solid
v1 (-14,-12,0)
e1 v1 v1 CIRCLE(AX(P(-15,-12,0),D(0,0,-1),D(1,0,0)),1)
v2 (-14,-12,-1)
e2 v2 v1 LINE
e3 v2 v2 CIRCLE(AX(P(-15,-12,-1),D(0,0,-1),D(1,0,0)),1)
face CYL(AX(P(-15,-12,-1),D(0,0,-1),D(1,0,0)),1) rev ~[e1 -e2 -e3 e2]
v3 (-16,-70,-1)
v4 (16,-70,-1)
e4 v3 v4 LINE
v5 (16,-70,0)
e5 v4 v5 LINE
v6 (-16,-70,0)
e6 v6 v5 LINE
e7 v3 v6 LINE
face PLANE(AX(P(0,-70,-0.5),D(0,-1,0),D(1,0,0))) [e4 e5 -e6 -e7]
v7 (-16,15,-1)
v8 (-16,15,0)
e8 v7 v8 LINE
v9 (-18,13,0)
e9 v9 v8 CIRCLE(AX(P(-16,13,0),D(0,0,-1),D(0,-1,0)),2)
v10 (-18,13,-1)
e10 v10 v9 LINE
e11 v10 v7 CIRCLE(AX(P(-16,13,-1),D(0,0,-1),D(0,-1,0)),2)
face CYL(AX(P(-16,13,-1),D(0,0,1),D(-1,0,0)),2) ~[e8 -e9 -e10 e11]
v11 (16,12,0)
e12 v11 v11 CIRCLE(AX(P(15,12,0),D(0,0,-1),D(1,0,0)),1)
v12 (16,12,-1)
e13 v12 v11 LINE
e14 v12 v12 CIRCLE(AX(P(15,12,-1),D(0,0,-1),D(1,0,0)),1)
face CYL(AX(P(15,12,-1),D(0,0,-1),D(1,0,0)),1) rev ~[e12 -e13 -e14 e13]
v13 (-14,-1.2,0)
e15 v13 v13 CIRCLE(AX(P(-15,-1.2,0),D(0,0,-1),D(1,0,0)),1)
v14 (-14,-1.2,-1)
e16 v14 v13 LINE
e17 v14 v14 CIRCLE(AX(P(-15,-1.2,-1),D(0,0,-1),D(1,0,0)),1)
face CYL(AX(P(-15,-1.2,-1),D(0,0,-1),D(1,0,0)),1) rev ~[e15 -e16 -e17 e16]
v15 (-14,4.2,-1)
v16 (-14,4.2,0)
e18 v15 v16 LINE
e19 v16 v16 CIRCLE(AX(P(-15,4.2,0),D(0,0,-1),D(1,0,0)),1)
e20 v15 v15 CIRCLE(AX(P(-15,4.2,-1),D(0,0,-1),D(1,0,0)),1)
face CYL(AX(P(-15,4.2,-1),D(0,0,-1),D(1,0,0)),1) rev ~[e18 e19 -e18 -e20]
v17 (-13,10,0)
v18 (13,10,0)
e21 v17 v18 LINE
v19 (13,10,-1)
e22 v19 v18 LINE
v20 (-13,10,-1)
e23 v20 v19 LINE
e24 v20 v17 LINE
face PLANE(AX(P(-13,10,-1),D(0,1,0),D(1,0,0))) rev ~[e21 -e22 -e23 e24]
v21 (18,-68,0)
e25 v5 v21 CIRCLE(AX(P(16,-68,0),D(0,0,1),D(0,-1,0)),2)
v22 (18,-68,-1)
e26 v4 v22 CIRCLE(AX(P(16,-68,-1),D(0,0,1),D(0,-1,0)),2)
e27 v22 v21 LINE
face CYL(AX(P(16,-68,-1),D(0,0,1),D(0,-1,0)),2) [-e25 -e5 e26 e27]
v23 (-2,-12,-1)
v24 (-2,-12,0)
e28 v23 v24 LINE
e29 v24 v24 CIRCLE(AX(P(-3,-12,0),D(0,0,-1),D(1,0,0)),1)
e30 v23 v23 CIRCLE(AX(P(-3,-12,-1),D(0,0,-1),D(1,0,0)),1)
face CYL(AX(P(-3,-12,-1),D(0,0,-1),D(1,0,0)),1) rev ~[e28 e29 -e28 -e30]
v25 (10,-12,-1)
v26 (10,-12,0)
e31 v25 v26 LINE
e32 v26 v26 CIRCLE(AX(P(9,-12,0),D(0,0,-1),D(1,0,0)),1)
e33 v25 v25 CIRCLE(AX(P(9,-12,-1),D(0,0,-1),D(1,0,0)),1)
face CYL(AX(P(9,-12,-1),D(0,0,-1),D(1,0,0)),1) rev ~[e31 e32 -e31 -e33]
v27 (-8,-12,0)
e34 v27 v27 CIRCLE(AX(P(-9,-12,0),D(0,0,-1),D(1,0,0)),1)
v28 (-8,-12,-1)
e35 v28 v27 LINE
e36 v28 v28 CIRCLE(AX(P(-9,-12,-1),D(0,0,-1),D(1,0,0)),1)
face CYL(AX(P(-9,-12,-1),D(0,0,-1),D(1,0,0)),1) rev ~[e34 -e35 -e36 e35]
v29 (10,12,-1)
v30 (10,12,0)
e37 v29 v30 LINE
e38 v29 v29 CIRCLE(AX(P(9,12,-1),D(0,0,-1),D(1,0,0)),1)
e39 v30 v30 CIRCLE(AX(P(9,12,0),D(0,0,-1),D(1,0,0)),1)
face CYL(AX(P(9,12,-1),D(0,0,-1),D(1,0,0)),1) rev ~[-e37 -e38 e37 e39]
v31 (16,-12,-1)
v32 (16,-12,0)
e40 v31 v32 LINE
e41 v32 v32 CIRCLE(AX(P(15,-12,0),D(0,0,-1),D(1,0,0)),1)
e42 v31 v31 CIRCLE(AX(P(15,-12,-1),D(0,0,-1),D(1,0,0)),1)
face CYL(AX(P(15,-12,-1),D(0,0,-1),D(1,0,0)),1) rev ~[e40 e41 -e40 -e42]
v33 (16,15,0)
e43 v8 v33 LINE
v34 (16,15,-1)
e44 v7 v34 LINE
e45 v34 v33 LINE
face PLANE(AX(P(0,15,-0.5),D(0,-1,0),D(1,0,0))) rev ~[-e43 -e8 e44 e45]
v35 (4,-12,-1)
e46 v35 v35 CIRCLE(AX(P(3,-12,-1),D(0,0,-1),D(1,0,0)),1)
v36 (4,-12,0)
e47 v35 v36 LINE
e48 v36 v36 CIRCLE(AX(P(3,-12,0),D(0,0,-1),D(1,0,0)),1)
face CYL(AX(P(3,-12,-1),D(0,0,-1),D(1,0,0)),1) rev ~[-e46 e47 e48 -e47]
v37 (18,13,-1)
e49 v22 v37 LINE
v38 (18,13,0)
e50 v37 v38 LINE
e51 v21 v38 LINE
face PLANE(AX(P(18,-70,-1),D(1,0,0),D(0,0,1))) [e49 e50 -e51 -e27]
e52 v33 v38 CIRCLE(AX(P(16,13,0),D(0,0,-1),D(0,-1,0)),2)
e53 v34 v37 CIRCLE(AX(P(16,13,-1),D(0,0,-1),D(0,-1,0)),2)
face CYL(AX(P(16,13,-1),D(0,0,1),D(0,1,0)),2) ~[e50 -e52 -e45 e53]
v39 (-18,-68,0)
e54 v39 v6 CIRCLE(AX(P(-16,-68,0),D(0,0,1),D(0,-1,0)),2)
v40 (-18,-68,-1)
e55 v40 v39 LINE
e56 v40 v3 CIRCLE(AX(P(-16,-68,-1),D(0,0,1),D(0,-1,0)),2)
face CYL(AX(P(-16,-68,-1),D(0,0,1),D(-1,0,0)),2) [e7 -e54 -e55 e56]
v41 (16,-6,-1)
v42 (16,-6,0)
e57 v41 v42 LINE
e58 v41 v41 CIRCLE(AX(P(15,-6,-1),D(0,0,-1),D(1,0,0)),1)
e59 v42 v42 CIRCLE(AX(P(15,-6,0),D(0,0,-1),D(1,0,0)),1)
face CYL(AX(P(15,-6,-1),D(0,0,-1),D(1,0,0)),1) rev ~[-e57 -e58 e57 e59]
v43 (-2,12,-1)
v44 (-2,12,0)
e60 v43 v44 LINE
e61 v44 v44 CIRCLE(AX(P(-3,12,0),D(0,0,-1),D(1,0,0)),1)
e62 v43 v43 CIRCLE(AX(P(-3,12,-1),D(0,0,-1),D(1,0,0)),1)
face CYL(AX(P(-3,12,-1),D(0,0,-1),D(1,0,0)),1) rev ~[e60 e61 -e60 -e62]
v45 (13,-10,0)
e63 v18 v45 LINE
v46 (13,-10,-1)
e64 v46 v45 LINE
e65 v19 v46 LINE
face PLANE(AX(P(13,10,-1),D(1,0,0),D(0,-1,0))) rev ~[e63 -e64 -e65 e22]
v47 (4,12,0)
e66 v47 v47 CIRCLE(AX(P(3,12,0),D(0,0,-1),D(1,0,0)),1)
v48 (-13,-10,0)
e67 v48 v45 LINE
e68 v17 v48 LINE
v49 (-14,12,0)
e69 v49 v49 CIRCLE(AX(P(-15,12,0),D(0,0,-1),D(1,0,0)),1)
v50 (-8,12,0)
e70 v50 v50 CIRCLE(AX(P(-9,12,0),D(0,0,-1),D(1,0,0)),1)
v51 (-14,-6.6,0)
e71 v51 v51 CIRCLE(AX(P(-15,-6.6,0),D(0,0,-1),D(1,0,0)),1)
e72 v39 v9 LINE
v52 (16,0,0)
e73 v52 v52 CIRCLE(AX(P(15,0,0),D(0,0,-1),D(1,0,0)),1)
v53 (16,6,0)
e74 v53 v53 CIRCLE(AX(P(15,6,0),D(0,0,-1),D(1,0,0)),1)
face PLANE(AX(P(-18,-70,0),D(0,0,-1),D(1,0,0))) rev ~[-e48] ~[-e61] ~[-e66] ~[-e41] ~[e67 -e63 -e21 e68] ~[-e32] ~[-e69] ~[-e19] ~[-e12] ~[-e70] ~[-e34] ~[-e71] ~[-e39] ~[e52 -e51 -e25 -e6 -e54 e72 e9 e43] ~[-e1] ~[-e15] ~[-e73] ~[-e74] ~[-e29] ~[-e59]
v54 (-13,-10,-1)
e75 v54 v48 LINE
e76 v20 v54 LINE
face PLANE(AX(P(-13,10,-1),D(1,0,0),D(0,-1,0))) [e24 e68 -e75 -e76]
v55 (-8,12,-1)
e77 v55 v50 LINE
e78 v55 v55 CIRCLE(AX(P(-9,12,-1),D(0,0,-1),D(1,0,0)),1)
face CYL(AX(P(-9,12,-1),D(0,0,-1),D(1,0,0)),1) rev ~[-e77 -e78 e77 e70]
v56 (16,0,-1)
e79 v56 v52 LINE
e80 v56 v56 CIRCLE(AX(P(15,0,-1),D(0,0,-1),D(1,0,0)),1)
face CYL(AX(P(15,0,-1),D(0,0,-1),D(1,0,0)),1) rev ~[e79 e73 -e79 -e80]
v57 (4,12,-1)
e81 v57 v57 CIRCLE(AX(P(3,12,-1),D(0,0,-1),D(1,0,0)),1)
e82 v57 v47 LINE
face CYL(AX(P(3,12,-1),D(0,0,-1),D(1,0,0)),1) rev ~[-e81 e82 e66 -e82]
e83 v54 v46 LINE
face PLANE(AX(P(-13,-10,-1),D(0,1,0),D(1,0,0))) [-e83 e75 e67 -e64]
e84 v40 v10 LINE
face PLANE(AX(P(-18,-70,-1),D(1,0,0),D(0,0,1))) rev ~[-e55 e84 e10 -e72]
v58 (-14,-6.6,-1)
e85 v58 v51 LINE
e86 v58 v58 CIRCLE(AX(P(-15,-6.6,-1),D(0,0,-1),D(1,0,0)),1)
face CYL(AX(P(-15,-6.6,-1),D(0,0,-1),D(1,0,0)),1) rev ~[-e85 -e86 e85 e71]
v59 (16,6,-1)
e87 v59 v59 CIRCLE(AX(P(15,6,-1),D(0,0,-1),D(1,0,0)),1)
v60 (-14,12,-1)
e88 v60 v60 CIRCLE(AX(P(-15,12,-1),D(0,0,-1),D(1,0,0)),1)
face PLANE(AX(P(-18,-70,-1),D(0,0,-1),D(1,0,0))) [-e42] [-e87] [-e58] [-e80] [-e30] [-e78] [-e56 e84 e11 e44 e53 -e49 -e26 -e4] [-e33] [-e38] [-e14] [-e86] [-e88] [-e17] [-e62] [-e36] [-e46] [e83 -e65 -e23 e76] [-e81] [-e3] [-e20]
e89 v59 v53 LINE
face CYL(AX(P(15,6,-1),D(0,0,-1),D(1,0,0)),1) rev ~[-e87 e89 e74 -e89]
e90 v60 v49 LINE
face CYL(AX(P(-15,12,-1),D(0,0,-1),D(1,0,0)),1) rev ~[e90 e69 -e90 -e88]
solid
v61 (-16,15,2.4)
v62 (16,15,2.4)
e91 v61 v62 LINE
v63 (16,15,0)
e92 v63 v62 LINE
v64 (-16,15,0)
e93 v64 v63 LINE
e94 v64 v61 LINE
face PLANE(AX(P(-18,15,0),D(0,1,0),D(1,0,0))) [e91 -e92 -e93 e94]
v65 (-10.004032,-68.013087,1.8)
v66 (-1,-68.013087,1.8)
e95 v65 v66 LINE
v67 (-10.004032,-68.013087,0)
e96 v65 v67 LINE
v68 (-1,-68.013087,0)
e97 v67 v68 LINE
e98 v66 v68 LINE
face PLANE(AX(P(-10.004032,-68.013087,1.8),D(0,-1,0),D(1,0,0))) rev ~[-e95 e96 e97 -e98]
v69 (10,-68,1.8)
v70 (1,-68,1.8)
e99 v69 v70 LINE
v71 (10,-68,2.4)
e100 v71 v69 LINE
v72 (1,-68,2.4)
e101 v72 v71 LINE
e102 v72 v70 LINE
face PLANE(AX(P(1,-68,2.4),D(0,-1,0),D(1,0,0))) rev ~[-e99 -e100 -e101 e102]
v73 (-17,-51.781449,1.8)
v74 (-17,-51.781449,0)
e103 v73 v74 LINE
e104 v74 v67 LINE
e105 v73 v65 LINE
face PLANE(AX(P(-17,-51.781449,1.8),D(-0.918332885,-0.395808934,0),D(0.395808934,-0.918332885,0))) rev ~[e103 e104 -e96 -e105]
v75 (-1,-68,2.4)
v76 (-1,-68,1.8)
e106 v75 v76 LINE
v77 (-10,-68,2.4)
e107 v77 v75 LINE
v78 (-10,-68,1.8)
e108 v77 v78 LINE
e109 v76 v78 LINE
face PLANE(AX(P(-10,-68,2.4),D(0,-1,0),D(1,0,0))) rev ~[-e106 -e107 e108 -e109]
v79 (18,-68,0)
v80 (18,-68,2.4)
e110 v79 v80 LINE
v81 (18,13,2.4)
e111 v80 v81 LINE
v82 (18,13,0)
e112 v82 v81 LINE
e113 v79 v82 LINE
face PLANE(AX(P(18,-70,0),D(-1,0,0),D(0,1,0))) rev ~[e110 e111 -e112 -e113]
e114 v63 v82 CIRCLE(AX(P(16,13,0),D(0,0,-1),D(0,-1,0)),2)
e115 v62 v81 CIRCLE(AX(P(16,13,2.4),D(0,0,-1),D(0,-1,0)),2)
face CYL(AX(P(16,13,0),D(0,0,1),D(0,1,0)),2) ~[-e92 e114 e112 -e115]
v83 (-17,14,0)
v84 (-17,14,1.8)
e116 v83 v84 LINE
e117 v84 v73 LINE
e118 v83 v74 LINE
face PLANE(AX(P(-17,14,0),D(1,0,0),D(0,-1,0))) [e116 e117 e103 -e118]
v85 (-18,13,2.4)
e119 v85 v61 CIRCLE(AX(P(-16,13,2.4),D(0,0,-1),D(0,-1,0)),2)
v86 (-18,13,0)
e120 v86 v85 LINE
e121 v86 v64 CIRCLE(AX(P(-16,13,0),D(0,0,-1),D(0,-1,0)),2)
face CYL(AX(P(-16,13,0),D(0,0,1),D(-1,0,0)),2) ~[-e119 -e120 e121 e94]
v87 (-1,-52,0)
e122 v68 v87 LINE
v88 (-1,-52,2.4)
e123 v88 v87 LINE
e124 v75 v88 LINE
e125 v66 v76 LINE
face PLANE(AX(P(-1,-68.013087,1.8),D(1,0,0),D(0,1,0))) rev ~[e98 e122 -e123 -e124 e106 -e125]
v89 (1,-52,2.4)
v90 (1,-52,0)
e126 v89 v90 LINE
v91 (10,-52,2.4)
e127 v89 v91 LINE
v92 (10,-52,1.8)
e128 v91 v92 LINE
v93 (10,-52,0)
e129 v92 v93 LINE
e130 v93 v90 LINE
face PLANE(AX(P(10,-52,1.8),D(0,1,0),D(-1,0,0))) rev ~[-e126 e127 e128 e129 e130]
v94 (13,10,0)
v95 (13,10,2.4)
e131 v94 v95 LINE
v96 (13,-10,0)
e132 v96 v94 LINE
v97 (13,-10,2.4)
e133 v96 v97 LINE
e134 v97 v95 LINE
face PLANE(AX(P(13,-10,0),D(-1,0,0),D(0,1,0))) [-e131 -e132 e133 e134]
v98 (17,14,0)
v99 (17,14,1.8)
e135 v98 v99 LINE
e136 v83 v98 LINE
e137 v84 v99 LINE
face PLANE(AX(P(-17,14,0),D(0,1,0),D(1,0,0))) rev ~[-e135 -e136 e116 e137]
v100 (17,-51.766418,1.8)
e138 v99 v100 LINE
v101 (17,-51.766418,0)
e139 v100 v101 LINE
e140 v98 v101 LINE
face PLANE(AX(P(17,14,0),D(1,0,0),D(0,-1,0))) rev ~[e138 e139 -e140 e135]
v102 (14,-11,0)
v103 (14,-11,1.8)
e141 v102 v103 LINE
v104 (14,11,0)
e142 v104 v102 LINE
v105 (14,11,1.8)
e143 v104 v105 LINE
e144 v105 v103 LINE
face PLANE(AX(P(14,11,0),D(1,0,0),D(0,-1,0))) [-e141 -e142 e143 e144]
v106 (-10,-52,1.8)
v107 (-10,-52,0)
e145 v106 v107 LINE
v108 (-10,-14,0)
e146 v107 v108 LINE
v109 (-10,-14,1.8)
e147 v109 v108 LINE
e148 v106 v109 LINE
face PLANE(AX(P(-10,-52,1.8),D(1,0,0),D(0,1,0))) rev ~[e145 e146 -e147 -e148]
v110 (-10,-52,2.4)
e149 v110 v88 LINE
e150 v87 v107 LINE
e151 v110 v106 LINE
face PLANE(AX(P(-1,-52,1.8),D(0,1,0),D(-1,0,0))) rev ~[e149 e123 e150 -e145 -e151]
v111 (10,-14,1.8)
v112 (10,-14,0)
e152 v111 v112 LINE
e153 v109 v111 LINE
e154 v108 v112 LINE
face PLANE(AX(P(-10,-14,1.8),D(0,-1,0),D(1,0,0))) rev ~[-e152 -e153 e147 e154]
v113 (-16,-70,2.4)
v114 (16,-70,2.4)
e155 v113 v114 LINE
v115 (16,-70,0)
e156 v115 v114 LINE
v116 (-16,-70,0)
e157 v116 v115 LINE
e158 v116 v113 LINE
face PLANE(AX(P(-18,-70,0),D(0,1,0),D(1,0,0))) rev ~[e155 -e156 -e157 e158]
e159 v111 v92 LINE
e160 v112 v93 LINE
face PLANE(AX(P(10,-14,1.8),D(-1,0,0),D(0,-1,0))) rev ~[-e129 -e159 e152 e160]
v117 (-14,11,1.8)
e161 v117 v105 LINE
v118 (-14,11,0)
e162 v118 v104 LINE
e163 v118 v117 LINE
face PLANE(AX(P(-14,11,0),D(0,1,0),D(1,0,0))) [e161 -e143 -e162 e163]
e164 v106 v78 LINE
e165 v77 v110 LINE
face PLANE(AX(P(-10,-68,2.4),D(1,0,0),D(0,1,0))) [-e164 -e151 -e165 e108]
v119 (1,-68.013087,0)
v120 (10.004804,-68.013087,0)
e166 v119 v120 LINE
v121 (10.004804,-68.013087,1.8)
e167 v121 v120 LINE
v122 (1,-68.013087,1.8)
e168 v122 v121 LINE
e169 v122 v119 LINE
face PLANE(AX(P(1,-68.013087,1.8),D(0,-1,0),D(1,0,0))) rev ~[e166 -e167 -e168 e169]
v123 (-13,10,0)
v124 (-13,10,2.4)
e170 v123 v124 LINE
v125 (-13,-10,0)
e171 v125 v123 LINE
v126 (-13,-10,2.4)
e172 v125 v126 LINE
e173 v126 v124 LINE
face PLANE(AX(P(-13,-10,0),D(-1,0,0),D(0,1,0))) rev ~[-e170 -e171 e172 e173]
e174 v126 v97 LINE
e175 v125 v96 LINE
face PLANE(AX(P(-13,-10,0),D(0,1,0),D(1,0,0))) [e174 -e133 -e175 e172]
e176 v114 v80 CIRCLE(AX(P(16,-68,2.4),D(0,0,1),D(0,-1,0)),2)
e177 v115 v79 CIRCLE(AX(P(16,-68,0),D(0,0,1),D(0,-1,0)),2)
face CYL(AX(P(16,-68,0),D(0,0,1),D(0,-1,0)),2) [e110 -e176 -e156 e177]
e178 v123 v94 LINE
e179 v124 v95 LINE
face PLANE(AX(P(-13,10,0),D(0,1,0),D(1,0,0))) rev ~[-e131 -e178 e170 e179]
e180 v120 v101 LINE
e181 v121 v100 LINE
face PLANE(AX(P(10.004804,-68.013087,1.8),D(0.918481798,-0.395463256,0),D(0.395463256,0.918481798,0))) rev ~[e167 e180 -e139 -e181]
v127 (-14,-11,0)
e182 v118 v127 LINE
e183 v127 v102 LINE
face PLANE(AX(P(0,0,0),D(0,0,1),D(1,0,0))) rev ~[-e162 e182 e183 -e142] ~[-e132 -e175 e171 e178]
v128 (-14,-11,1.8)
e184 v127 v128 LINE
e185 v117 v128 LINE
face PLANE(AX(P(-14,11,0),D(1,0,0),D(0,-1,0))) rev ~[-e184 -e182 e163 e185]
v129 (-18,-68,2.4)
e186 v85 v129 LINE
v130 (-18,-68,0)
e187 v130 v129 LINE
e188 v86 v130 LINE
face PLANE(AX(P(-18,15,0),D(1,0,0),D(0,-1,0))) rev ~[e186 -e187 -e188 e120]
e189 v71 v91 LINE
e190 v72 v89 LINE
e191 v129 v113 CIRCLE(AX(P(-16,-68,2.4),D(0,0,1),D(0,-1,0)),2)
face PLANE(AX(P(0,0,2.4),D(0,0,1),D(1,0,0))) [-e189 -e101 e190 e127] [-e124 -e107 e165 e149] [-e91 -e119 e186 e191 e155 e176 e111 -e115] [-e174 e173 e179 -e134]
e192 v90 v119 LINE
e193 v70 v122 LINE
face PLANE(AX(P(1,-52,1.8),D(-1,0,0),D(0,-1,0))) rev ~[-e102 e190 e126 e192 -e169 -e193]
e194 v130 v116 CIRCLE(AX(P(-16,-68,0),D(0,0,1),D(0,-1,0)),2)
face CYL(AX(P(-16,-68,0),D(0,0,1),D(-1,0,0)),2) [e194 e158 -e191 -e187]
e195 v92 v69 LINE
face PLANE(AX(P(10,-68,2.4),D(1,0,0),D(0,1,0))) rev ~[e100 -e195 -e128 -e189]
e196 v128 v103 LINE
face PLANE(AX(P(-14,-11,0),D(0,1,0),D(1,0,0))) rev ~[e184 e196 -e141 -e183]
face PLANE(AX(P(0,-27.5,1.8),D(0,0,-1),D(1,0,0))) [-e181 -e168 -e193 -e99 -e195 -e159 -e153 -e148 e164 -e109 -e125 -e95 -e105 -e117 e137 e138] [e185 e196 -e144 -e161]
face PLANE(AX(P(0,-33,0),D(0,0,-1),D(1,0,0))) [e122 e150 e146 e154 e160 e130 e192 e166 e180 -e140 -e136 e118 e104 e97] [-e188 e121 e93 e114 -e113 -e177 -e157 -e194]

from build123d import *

# Parameters (mm, degrees)
F0_W      = 36
F0_H      = 30
F0_W_2    = 26
F0_H_2    = 20
F0_H_3    = 37
F0_H_4    = 18
F1_DEPTH  = 2.4
F2_W      = 34
F2_H      = 83
F2_W_2    = 28
F2_H_2    = 22
F3_DEPTH  = 1.8
F4_W      = 36
F4_H      = 1
F5_DEPTH  = 85
F8_DEPTH  = 1.8
F6_R      = 1
F9_DEPTH  = 3
F6_W      = 26
F6_H      = 20
F11_DEPTH = 25
F12_R     = 2
F12_2_R   = 2
F10_W     = 9
F10_H     = 16
F13_DEPTH = 3


# Not quite as in the source:
# - a feature names something its author has since deleted; it is built from what else it names


with BuildPart() as f1:
    # F0 (on Top) → F1 (new body)
    with BuildSketch(Plane.XY):
        Rectangle(F0_W, F0_H)
        Rectangle(F0_W_2, F0_H_2, mode=Mode.SUBTRACT)
        with Locations((0, -33.5)):
            Rectangle(F0_W, F0_H_3)
        with Locations((0, -61)):
            Rectangle(F0_W, F0_H_4)
    extrude(amount=F1_DEPTH)

    # F2 (on face) → F3 (cut)
    with BuildSketch(Plane(origin=(0, 0, 0), x_dir=(1, 0, 0), z_dir=(0, 0, -1))):
        with Locations((0, 27.5)):
            Rectangle(F2_W, F2_H)
        Rectangle(F2_W_2, F2_H_2, mode=Mode.SUBTRACT)
    extrude(amount=-F3_DEPTH, mode=Mode.SUBTRACT)

    # F7 (on face) → F8 (join, through all)
    with BuildSketch(Plane(origin=(0, 0, 1.8), x_dir=(1, 0, 0), z_dir=(0, 0, -1))):
        Polygon((-10, 14), (0, 14), (10, 14), (10, 52), (1, 52), (0, 52), (-1, 52), (-10, 52), align=None)
        Polygon((-1, 68.013086915), (-1, 52), (0, 52), (1, 52), (1, 68.013086915), align=None)
        Polygon((-10.0040324032, 68.013086915), (-1, 68.013086915), (1, 68.013086915), (10.0048035383, 68.013086915), (17, 51.7664179206), (17, 69), (-17, 69), (-17, 53.814060986), (-17, 51.7814494669), align=None)
    extrude(amount=F8_DEPTH)

    # F12
    f12_edges = [f1.edges().sort_by_distance(p)[0] for p in [
        (18, 15, 1.2),
        (18, -70, 1.2),
        (-18, -70, 1.2),
        (-18, 15, 1.2),
    ]]
    fillet(f12_edges, radius=F12_R)

    # F10 (on face) → F13 (cut)
    with BuildSketch(Plane.XY.offset(2.4)):
        with Locations((5.5, -60)):
            Rectangle(F10_W, F10_H)
        with Locations((-5.5, -60)):
            Rectangle(F10_W, F10_H)
    extrude(amount=-F13_DEPTH, mode=Mode.SUBTRACT)


with BuildPart() as f5:
    # F4 (on face) → F5 (new body, through all)
    with BuildSketch(Plane.XZ.offset(70)):
        with Locations((0, -0.5)):
            Rectangle(F4_W, F4_H)
    extrude(amount=-F5_DEPTH)

    # F6 (on face) → F9 (cut)
    with BuildSketch(Plane(origin=(0, 0, -1), x_dir=(1, 0, 0), z_dir=(0, 0, -1))):
        with Locations((-15, -12)):
            Circle(F6_R)
        with Locations((-9, -12)):
            Circle(F6_R)
        with Locations((-3, -12)):
            Circle(F6_R)
        with Locations((3, -12)):
            Circle(F6_R)
        with Locations((9, -12)):
            Circle(F6_R)
        with Locations((15, -12)):
            Circle(F6_R)
        with Locations((15, -6)):
            Circle(F6_R)
        with Locations((15, 0)):
            Circle(F6_R)
        with Locations((15, 6)):
            Circle(F6_R)
        with Locations((15, 12)):
            Circle(F6_R)
        with Locations((9, 12)):
            Circle(F6_R)
        with Locations((3, 12)):
            Circle(F6_R)
        with Locations((-3, 12)):
            Circle(F6_R)
        with Locations((-9, 12)):
            Circle(F6_R)
        with Locations((-15, 12)):
            Circle(F6_R)
        with Locations((-15, 6.6)):
            Circle(F6_R)
        with Locations((-15, 1.2)):
            Circle(F6_R)
        with Locations((-15, -4.2)):
            Circle(F6_R)
    extrude(amount=-F9_DEPTH, mode=Mode.SUBTRACT)

    # F6 (on face) → F11 (cut)
    with BuildSketch(Plane(origin=(0, 0, -1), x_dir=(1, 0, 0), z_dir=(0, 0, -1))):
        Rectangle(F6_W, F6_H)
    extrude(amount=-F11_DEPTH, mode=Mode.SUBTRACT)

    # F12#2
    f12_2_edges = [f5.edges().sort_by_distance(p)[0] for p in [
        (18, 15, -0.5),
        (18, -70, -0.5),
        (-18, -70, -0.5),
        (-18, 15, -0.5),
    ]]
    fillet(f12_2_edges, radius=F12_2_R)


solid = Compound([f1.part, f5.part])
